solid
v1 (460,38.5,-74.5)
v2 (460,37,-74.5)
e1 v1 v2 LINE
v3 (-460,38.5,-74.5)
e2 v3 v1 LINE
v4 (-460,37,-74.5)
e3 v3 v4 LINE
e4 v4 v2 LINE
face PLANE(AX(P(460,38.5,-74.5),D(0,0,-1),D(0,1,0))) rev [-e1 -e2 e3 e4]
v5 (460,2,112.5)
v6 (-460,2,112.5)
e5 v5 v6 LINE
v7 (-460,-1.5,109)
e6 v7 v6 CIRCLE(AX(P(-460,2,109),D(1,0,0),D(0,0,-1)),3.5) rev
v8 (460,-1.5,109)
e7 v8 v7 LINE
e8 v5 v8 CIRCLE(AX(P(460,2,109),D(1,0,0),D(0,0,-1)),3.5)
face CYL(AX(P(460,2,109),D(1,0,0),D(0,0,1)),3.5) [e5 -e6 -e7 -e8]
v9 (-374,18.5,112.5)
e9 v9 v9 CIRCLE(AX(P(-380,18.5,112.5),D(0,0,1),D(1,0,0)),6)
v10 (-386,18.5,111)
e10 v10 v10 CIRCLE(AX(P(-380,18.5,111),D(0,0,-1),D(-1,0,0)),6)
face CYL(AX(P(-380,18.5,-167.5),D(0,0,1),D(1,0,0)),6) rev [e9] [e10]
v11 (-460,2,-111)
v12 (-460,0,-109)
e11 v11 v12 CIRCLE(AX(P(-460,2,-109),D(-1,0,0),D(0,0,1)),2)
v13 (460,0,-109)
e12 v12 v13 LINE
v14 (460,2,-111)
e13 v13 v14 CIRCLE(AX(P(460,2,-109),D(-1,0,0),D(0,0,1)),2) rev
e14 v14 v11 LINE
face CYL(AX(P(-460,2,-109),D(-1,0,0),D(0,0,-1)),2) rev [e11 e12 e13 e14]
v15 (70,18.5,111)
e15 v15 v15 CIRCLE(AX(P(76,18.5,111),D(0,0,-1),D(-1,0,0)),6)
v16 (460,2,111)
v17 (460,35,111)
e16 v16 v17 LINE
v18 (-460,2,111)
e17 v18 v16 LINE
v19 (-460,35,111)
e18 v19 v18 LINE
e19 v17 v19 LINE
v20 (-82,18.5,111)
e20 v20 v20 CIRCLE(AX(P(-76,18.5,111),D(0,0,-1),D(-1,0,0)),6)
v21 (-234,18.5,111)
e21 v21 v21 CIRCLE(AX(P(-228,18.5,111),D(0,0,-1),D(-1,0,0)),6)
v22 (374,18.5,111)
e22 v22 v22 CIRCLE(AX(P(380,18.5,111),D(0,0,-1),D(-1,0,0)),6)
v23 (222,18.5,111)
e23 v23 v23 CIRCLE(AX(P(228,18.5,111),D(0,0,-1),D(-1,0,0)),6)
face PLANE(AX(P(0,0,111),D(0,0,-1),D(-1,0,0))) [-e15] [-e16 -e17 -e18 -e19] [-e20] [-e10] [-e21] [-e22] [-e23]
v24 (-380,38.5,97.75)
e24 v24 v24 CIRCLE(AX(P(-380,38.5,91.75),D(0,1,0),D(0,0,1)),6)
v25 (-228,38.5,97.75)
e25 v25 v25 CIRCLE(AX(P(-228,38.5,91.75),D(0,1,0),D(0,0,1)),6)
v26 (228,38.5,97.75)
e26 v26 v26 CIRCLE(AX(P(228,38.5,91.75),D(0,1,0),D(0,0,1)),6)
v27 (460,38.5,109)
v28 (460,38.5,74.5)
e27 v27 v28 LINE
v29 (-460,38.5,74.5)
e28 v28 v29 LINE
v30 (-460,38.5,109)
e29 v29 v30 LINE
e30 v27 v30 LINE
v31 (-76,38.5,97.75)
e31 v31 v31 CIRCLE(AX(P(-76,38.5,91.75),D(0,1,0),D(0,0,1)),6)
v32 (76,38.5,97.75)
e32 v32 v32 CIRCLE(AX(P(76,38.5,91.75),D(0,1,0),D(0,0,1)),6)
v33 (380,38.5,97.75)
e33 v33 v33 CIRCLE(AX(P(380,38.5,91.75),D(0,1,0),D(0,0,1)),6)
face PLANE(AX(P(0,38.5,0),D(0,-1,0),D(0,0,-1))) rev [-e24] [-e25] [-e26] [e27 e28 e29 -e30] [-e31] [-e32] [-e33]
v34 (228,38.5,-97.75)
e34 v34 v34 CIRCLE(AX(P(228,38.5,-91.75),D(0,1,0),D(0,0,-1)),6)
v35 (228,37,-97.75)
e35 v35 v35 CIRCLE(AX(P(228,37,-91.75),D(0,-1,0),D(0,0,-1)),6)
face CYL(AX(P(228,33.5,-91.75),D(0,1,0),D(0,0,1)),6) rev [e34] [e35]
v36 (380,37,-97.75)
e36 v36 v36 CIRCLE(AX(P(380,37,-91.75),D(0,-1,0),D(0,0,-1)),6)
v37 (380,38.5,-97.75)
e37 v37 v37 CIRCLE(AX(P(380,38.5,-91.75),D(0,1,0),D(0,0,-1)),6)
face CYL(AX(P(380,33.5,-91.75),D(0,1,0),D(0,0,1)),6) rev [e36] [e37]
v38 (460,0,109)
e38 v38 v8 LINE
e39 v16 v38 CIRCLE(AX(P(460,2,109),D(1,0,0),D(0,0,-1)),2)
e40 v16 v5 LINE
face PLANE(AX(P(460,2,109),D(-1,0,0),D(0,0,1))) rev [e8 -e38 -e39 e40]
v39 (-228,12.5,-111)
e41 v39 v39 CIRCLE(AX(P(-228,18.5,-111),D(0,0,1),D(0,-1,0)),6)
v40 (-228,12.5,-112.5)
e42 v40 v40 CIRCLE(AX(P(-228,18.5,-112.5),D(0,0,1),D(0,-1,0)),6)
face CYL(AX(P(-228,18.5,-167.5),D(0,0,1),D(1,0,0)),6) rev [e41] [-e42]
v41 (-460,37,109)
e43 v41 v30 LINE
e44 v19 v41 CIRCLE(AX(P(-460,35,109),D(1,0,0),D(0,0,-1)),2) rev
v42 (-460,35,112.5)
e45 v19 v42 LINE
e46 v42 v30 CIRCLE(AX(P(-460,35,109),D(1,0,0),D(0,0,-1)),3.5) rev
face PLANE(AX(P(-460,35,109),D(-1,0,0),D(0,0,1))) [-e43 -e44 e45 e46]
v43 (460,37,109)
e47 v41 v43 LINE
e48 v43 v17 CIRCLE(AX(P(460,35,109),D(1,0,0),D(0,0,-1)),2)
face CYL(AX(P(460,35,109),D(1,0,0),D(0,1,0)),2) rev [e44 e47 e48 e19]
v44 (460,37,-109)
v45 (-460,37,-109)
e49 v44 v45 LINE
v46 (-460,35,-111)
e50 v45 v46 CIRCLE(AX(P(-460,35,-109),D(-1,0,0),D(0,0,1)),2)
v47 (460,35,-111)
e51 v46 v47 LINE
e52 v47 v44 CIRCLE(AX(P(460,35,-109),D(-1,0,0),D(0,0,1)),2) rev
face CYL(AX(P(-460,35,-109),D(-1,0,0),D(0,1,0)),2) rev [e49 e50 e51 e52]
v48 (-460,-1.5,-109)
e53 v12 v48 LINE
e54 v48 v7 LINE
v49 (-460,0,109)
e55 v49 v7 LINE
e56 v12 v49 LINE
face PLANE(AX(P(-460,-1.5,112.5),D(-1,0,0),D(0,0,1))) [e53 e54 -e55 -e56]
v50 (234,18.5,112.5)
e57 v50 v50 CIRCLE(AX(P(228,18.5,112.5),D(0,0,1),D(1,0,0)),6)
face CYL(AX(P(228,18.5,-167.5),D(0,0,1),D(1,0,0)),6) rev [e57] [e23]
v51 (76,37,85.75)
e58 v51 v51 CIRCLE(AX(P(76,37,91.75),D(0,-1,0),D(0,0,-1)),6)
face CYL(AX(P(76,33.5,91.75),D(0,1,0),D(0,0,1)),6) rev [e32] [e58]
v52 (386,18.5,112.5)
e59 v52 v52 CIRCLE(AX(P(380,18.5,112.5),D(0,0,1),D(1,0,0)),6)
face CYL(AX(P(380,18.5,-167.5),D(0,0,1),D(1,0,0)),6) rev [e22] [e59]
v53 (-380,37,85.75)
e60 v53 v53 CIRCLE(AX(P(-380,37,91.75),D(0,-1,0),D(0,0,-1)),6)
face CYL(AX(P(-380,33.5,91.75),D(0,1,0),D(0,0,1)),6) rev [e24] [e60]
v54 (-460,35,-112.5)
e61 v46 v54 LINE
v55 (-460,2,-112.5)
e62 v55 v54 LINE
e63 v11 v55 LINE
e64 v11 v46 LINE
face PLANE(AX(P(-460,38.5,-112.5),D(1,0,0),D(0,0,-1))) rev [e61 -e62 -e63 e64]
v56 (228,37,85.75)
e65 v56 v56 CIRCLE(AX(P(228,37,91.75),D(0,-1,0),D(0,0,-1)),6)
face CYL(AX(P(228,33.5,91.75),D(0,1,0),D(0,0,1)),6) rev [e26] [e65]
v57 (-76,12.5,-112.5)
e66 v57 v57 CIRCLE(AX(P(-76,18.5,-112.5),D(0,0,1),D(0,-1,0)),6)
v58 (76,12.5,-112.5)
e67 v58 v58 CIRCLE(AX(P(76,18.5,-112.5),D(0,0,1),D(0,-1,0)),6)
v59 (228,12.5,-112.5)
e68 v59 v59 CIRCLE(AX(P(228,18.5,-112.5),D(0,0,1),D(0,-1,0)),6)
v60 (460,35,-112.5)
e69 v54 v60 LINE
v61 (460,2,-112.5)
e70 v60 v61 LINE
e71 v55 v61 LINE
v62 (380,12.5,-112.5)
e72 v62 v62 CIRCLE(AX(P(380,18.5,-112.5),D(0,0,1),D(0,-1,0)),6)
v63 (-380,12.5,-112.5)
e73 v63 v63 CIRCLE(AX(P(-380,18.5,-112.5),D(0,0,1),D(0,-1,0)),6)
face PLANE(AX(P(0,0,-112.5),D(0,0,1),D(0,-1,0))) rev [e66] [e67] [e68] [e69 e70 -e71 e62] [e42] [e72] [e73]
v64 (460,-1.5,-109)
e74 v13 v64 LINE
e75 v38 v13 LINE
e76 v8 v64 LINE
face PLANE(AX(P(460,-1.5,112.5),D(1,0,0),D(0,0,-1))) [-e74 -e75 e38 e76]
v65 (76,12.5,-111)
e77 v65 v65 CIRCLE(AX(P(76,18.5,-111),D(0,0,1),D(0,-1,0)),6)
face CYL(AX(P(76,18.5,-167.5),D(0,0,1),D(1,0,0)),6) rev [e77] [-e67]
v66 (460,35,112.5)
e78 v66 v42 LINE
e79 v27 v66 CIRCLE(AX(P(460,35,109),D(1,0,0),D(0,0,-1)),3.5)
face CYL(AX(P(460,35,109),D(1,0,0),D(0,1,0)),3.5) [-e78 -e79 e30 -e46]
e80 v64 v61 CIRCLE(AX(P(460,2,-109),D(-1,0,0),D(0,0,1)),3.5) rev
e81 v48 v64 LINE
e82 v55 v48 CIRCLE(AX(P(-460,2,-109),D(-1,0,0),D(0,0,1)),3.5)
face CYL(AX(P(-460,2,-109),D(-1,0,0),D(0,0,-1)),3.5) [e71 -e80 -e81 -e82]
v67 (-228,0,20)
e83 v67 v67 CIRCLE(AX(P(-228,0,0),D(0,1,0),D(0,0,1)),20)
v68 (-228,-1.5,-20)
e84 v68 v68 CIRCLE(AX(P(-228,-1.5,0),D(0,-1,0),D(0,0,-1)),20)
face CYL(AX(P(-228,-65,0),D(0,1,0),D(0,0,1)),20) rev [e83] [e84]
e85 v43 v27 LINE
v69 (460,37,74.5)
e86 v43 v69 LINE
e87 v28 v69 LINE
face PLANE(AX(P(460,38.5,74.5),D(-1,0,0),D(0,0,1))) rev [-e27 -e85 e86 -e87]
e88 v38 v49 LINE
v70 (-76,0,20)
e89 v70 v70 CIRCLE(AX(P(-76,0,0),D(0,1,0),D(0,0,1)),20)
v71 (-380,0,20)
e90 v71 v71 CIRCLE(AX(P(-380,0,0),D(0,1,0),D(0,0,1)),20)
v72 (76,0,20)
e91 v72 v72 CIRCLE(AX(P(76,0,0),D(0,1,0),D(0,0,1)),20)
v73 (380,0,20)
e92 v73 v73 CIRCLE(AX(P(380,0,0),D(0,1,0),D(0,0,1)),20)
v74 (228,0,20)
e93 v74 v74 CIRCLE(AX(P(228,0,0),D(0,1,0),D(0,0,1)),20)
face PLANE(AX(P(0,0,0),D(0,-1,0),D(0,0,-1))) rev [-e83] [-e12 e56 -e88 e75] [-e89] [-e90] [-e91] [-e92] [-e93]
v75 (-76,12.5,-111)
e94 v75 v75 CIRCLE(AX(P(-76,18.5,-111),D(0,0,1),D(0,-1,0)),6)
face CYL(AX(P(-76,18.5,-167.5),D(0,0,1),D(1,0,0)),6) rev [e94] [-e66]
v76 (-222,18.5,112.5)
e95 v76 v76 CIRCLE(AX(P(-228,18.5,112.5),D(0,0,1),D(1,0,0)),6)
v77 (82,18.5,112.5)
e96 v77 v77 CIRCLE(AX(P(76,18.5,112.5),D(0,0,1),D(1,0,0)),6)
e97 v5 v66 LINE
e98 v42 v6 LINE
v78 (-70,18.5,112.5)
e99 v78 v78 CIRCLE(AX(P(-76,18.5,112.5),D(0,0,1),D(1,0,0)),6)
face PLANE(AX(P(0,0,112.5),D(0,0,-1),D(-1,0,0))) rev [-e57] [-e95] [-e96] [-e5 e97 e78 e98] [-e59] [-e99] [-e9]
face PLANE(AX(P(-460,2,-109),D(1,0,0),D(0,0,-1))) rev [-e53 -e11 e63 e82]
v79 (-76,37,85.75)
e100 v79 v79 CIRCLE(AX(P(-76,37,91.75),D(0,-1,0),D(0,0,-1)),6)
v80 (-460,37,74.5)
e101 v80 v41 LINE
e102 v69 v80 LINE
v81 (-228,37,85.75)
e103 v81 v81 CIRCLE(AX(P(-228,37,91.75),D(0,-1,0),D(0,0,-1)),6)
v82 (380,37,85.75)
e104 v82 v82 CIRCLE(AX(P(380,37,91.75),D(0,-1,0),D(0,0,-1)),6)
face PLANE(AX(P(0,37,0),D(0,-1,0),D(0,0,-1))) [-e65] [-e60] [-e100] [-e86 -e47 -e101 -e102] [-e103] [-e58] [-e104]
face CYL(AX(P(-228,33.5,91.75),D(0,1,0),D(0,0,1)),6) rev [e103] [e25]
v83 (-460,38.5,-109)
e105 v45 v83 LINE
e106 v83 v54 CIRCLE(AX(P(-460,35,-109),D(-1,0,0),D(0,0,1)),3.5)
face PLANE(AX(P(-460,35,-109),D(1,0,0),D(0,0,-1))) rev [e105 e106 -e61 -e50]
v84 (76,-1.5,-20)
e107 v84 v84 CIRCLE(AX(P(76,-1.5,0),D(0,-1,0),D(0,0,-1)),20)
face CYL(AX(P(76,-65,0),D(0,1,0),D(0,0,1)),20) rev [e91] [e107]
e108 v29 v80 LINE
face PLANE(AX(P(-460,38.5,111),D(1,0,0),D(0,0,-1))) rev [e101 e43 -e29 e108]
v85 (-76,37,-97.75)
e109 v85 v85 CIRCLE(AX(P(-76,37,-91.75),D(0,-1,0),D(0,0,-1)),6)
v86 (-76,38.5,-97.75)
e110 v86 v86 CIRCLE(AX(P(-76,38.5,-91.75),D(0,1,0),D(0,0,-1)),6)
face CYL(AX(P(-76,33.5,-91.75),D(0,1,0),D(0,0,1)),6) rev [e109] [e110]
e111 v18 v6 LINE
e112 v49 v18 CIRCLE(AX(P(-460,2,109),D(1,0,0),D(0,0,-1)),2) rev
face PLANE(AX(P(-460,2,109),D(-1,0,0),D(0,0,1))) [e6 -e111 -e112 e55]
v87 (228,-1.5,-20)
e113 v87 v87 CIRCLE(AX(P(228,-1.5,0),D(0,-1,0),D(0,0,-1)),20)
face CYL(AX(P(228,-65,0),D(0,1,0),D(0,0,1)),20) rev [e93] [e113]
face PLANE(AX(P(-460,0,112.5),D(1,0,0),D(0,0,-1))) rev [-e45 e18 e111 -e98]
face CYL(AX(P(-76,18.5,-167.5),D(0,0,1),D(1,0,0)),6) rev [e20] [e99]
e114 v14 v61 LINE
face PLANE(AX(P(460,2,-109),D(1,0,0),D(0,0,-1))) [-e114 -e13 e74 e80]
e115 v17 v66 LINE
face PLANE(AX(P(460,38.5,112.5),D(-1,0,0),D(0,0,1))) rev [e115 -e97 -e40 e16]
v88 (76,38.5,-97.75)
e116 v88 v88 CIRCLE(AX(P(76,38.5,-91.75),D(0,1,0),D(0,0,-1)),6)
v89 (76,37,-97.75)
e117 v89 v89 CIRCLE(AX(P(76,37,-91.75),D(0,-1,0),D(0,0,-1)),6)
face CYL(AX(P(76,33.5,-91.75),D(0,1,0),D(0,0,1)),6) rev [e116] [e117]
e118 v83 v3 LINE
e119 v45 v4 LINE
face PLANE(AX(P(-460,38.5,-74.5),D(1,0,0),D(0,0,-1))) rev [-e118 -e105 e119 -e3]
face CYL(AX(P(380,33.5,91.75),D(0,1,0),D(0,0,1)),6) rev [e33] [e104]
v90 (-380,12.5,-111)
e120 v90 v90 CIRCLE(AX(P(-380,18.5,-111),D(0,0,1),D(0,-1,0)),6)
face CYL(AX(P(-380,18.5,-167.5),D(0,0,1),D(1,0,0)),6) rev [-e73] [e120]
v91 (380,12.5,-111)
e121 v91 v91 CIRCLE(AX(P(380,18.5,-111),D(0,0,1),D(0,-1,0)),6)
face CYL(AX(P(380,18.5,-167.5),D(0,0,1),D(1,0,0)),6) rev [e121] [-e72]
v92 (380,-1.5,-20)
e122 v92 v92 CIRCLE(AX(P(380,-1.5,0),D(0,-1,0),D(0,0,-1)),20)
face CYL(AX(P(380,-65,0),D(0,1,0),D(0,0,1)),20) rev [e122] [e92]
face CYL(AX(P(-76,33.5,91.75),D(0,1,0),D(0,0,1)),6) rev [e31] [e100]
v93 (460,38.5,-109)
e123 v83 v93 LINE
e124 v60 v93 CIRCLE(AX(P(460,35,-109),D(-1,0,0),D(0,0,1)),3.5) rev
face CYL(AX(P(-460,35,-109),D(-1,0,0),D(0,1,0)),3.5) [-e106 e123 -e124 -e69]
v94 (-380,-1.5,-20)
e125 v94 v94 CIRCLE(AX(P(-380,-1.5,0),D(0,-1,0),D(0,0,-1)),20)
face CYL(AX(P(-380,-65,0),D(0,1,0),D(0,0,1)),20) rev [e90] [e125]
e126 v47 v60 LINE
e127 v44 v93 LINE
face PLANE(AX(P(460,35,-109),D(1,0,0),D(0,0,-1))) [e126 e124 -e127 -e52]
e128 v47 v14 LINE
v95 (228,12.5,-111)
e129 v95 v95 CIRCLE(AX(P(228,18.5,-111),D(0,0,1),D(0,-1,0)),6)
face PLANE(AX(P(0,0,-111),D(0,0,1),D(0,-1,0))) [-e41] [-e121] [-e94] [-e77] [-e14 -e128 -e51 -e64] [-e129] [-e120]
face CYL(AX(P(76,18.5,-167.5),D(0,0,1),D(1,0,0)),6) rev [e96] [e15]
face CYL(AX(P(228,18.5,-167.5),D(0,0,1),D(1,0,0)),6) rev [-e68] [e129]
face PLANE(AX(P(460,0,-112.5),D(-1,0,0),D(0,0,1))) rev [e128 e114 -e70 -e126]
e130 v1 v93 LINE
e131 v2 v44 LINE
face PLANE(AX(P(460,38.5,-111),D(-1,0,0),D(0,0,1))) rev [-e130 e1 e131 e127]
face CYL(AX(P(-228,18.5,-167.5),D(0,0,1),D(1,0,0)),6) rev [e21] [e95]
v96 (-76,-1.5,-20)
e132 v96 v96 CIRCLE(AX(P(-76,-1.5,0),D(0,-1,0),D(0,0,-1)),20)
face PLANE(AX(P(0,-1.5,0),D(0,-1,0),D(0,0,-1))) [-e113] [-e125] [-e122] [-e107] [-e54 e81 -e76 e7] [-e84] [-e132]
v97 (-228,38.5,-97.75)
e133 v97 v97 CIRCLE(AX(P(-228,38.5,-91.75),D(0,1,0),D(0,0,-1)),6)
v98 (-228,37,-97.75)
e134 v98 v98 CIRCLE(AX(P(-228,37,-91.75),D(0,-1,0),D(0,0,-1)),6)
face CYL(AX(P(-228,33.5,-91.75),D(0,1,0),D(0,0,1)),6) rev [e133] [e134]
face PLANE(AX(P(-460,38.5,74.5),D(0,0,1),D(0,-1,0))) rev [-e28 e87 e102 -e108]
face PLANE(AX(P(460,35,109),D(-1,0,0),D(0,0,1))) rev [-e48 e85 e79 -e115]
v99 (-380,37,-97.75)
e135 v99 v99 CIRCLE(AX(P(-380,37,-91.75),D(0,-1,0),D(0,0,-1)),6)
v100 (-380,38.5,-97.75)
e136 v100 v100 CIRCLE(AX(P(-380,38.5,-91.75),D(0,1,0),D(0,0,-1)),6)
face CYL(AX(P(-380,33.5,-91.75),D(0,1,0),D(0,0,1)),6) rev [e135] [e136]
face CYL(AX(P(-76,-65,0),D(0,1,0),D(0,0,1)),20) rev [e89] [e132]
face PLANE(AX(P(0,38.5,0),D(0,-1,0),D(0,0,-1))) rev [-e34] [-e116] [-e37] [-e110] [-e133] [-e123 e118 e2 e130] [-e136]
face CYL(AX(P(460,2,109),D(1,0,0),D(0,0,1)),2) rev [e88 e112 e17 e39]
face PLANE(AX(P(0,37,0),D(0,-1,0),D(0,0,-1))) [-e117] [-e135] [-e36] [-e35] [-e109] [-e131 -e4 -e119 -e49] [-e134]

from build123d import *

# Parameters (mm, degrees)
SKETCH1_W                      = 920
SKETCH1_H                      = 225
BASE_FLANGE1_DEPTH             = 1.5
EDGE_FLANGE1_STRIP_W           = 10
EDGE_FLANGE1_STRIP_H           = 1.5
EDGE_FLANGE1_STRIP_CUT_DEPTH   = 920
EDGE_FLANGE1_STRIP_2_W         = 10
EDGE_FLANGE1_STRIP_2_H         = 1.5
EDGE_FLANGE1_STRIP_CUT_2_DEPTH = 920
EDGE_FLANGE1_DEPTH             = 920
EDGE_FLANGE1_BEND_DEPTH        = 920
EDGE_FLANGE2_STRIP_W           = 10
EDGE_FLANGE2_STRIP_H           = 1.5
EDGE_FLANGE2_STRIP_CUT_DEPTH   = 920
EDGE_FLANGE2_STRIP_2_W         = 10
EDGE_FLANGE2_STRIP_2_H         = 1.5
EDGE_FLANGE2_STRIP_CUT_2_DEPTH = 920
EDGE_FLANGE2_DEPTH             = 920
EDGE_FLANGE2_BEND_DEPTH        = 920
SKETCH18_R                     = 6
CUT_EXTRUDE1_DEPTH             = 280
SKETCH19_R                     = 6
CUT_EXTRUDE2_DEPTH             = 5
SKETCH20_R                     = 20
CUT_EXTRUDE3_DEPTH             = 65


# Sheet-metal steps are written as plain solids
with BuildPart() as part:
    # Sketch1 → Base-Flange1 (new body)
    with BuildSketch(Plane(origin=(0, 0, 0), x_dir=(1, 0, 0), z_dir=(0, 1, 0))):
        Rectangle(SKETCH1_W, SKETCH1_H)
    extrude(amount=-BASE_FLANGE1_DEPTH)

    # Edge-Flange1 strip (across the edge) → Edge-Flange1 strip cut (cut)
    with BuildSketch(Plane(origin=(-460, 0, 112.5), x_dir=(0, 0, -1), z_dir=(1, 0, 0))):
        with Locations((-1.5, -0.75)):
            Rectangle(EDGE_FLANGE1_STRIP_W, EDGE_FLANGE1_STRIP_H)
    extrude(amount=EDGE_FLANGE1_STRIP_CUT_DEPTH, mode=Mode.SUBTRACT)

    # Edge-Flange1 strip 2 (across the edge) → Edge-Flange1 strip cut 2 (cut)
    with BuildSketch(Plane(origin=(460, 0, -112.5), x_dir=(0, 0, 1), z_dir=(-1, 0, 0))):
        with Locations((-1.5, -0.75)):
            Rectangle(EDGE_FLANGE1_STRIP_2_W, EDGE_FLANGE1_STRIP_2_H)
    extrude(amount=EDGE_FLANGE1_STRIP_CUT_2_DEPTH, mode=Mode.SUBTRACT)

    # Edge-Flange1 section (across the edge) → Edge-Flange1 (add)
    with BuildSketch(Plane(origin=(-460, 0, 112.5), x_dir=(0, 0, -1), z_dir=(1, 0, 0))):
        with BuildLine():
            Line((0, 2), (0, 38.5))
            Line((0, 38.5), (1.5, 38.5))
            Line((1.5, 38.5), (1.5, 2))
            ThreePointArc((1.5, 2), (2.085786438, 0.585786438), (3.5, 0))
            Line((3.5, 0), (3.5, -1.5))
            ThreePointArc((3.5, -1.5), (1.025126266, -0.474873734), (0, 2))
        make_face()
    extrude(amount=EDGE_FLANGE1_DEPTH)

    # Edge-Flange1 section 2 (across the edge) → Edge-Flange1 bend (add)
    with BuildSketch(Plane(origin=(460, 0, -112.5), x_dir=(0, 0, 1), z_dir=(-1, 0, 0))):
        with BuildLine():
            Line((0, 2), (0, 38.5))
            Line((0, 38.5), (1.5, 38.5))
            Line((1.5, 38.5), (1.5, 2))
            ThreePointArc((1.5, 2), (2.085786438, 0.585786438), (3.5, 0))
            Line((3.5, 0), (3.5, -1.5))
            ThreePointArc((3.5, -1.5), (1.025126266, -0.474873734), (0, 2))
        make_face()
    extrude(amount=EDGE_FLANGE1_BEND_DEPTH)

    # Edge-Flange2 strip (across the edge) → Edge-Flange2 strip cut (cut)
    with BuildSketch(Plane(origin=(-460, 38.5, 111), x_dir=(0, -1, 0), z_dir=(1, 0, 0))):
        with Locations((-1.5, -0.75)):
            Rectangle(EDGE_FLANGE2_STRIP_W, EDGE_FLANGE2_STRIP_H)
    extrude(amount=EDGE_FLANGE2_STRIP_CUT_DEPTH, mode=Mode.SUBTRACT)

    # Edge-Flange2 strip 2 (across the edge) → Edge-Flange2 strip cut 2 (cut)
    with BuildSketch(Plane(origin=(460, 38.5, -111), x_dir=(0, -1, 0), z_dir=(-1, 0, 0))):
        with Locations((-1.5, -0.75)):
            Rectangle(EDGE_FLANGE2_STRIP_2_W, EDGE_FLANGE2_STRIP_2_H)
    extrude(amount=EDGE_FLANGE2_STRIP_CUT_2_DEPTH, mode=Mode.SUBTRACT)

    # Edge-Flange2 section (across the edge) → Edge-Flange2 (add)
    with BuildSketch(Plane(origin=(-460, 38.5, 111), x_dir=(0, -1, 0), z_dir=(1, 0, 0))):
        with BuildLine():
            Line((0, 2), (0, 36.5))
            Line((0, 36.5), (1.5, 36.5))
            Line((1.5, 36.5), (1.5, 2))
            ThreePointArc((1.5, 2), (2.085786438, 0.585786438), (3.5, 0))
            Line((3.5, 0), (3.5, -1.5))
            ThreePointArc((3.5, -1.5), (1.025126266, -0.474873734), (0, 2))
        make_face()
    extrude(amount=EDGE_FLANGE2_DEPTH)

    # Edge-Flange2 section 2 (across the edge) → Edge-Flange2 bend (add)
    with BuildSketch(Plane(origin=(460, 38.5, -111), x_dir=(0, -1, 0), z_dir=(-1, 0, 0))):
        with BuildLine():
            Line((0, 2), (0, 36.5))
            Line((0, 36.5), (1.5, 36.5))
            Line((1.5, 36.5), (1.5, 2))
            ThreePointArc((1.5, 2), (2.085786438, 0.585786438), (3.5, 0))
            Line((3.5, 0), (3.5, -1.5))
            ThreePointArc((3.5, -1.5), (1.025126266, -0.474873734), (0, 2))
        make_face()
    extrude(amount=EDGE_FLANGE2_BEND_DEPTH)

    # Sketch18 → Cut-Extrude1 (cut)
    with BuildSketch(Plane.XY.offset(112.5)):
        with Locations((380, 18.5)):
            Circle(SKETCH18_R)
        with Locations((228, 18.5)):
            Circle(SKETCH18_R)
        with Locations((76, 18.5)):
            Circle(SKETCH18_R)
        with Locations((-76, 18.5)):
            Circle(SKETCH18_R)
        with Locations((-228, 18.5)):
            Circle(SKETCH18_R)
        with Locations((-380, 18.5)):
            Circle(SKETCH18_R)
    extrude(amount=-CUT_EXTRUDE1_DEPTH, mode=Mode.SUBTRACT)

    # Sketch19 → Cut-Extrude2 (cut)
    with BuildSketch(Plane(origin=(0, 38.5, 0), x_dir=(1, 0, 0), z_dir=(0, 1, 0))):
        with Locations(Location((-380, -91.75, 0), (0, 0, 270))):
            Circle(SKETCH19_R)
        with Locations(Location((-228, -91.75, 0), (0, 0, 270))):
            Circle(SKETCH19_R)
        with Locations(Location((-76, -91.75, 0), (0, 0, 270))):
            Circle(SKETCH19_R)
        with Locations(Location((76, -91.75, 0), (0, 0, 270))):
            Circle(SKETCH19_R)
        with Locations(Location((228, -91.75, 0), (0, 0, 270))):
            Circle(SKETCH19_R)
        with Locations(Location((380, -91.75, 0), (0, 0, 270))):
            Circle(SKETCH19_R)
        with Locations(Location((380, 91.75, 0), (0, 0, 90))):
            Circle(SKETCH19_R)
        with Locations(Location((228, 91.75, 0), (0, 0, 90))):
            Circle(SKETCH19_R)
        with Locations(Location((76, 91.75, 0), (0, 0, 90))):
            Circle(SKETCH19_R)
        with Locations(Location((-76, 91.75, 0), (0, 0, 90))):
            Circle(SKETCH19_R)
        with Locations(Location((-228, 91.75, 0), (0, 0, 90))):
            Circle(SKETCH19_R)
        with Locations(Location((-380, 91.75, 0), (0, 0, 90))):
            Circle(SKETCH19_R)
    extrude(amount=-CUT_EXTRUDE2_DEPTH, mode=Mode.SUBTRACT)

    # Sketch20 → Cut-Extrude3 (cut)
    with BuildSketch(Plane(origin=(0, 0, 0), x_dir=(1, 0, 0), z_dir=(0, 1, 0))):
        with Locations(Location((-380, 0, 0), (0, 0, 270))):
            Circle(SKETCH20_R)
        with Locations(Location((-228, 0, 0), (0, 0, 270))):
            Circle(SKETCH20_R)
        with Locations(Location((-76, 0, 0), (0, 0, 270))):
            Circle(SKETCH20_R)
        with Locations(Location((76, 0, 0), (0, 0, 270))):
            Circle(SKETCH20_R)
        with Locations(Location((228, 0, 0), (0, 0, 270))):
            Circle(SKETCH20_R)
        with Locations(Location((380, 0, 0), (0, 0, 270))):
            Circle(SKETCH20_R)
    extrude(amount=-CUT_EXTRUDE3_DEPTH, mode=Mode.SUBTRACT)


solid = part.part
